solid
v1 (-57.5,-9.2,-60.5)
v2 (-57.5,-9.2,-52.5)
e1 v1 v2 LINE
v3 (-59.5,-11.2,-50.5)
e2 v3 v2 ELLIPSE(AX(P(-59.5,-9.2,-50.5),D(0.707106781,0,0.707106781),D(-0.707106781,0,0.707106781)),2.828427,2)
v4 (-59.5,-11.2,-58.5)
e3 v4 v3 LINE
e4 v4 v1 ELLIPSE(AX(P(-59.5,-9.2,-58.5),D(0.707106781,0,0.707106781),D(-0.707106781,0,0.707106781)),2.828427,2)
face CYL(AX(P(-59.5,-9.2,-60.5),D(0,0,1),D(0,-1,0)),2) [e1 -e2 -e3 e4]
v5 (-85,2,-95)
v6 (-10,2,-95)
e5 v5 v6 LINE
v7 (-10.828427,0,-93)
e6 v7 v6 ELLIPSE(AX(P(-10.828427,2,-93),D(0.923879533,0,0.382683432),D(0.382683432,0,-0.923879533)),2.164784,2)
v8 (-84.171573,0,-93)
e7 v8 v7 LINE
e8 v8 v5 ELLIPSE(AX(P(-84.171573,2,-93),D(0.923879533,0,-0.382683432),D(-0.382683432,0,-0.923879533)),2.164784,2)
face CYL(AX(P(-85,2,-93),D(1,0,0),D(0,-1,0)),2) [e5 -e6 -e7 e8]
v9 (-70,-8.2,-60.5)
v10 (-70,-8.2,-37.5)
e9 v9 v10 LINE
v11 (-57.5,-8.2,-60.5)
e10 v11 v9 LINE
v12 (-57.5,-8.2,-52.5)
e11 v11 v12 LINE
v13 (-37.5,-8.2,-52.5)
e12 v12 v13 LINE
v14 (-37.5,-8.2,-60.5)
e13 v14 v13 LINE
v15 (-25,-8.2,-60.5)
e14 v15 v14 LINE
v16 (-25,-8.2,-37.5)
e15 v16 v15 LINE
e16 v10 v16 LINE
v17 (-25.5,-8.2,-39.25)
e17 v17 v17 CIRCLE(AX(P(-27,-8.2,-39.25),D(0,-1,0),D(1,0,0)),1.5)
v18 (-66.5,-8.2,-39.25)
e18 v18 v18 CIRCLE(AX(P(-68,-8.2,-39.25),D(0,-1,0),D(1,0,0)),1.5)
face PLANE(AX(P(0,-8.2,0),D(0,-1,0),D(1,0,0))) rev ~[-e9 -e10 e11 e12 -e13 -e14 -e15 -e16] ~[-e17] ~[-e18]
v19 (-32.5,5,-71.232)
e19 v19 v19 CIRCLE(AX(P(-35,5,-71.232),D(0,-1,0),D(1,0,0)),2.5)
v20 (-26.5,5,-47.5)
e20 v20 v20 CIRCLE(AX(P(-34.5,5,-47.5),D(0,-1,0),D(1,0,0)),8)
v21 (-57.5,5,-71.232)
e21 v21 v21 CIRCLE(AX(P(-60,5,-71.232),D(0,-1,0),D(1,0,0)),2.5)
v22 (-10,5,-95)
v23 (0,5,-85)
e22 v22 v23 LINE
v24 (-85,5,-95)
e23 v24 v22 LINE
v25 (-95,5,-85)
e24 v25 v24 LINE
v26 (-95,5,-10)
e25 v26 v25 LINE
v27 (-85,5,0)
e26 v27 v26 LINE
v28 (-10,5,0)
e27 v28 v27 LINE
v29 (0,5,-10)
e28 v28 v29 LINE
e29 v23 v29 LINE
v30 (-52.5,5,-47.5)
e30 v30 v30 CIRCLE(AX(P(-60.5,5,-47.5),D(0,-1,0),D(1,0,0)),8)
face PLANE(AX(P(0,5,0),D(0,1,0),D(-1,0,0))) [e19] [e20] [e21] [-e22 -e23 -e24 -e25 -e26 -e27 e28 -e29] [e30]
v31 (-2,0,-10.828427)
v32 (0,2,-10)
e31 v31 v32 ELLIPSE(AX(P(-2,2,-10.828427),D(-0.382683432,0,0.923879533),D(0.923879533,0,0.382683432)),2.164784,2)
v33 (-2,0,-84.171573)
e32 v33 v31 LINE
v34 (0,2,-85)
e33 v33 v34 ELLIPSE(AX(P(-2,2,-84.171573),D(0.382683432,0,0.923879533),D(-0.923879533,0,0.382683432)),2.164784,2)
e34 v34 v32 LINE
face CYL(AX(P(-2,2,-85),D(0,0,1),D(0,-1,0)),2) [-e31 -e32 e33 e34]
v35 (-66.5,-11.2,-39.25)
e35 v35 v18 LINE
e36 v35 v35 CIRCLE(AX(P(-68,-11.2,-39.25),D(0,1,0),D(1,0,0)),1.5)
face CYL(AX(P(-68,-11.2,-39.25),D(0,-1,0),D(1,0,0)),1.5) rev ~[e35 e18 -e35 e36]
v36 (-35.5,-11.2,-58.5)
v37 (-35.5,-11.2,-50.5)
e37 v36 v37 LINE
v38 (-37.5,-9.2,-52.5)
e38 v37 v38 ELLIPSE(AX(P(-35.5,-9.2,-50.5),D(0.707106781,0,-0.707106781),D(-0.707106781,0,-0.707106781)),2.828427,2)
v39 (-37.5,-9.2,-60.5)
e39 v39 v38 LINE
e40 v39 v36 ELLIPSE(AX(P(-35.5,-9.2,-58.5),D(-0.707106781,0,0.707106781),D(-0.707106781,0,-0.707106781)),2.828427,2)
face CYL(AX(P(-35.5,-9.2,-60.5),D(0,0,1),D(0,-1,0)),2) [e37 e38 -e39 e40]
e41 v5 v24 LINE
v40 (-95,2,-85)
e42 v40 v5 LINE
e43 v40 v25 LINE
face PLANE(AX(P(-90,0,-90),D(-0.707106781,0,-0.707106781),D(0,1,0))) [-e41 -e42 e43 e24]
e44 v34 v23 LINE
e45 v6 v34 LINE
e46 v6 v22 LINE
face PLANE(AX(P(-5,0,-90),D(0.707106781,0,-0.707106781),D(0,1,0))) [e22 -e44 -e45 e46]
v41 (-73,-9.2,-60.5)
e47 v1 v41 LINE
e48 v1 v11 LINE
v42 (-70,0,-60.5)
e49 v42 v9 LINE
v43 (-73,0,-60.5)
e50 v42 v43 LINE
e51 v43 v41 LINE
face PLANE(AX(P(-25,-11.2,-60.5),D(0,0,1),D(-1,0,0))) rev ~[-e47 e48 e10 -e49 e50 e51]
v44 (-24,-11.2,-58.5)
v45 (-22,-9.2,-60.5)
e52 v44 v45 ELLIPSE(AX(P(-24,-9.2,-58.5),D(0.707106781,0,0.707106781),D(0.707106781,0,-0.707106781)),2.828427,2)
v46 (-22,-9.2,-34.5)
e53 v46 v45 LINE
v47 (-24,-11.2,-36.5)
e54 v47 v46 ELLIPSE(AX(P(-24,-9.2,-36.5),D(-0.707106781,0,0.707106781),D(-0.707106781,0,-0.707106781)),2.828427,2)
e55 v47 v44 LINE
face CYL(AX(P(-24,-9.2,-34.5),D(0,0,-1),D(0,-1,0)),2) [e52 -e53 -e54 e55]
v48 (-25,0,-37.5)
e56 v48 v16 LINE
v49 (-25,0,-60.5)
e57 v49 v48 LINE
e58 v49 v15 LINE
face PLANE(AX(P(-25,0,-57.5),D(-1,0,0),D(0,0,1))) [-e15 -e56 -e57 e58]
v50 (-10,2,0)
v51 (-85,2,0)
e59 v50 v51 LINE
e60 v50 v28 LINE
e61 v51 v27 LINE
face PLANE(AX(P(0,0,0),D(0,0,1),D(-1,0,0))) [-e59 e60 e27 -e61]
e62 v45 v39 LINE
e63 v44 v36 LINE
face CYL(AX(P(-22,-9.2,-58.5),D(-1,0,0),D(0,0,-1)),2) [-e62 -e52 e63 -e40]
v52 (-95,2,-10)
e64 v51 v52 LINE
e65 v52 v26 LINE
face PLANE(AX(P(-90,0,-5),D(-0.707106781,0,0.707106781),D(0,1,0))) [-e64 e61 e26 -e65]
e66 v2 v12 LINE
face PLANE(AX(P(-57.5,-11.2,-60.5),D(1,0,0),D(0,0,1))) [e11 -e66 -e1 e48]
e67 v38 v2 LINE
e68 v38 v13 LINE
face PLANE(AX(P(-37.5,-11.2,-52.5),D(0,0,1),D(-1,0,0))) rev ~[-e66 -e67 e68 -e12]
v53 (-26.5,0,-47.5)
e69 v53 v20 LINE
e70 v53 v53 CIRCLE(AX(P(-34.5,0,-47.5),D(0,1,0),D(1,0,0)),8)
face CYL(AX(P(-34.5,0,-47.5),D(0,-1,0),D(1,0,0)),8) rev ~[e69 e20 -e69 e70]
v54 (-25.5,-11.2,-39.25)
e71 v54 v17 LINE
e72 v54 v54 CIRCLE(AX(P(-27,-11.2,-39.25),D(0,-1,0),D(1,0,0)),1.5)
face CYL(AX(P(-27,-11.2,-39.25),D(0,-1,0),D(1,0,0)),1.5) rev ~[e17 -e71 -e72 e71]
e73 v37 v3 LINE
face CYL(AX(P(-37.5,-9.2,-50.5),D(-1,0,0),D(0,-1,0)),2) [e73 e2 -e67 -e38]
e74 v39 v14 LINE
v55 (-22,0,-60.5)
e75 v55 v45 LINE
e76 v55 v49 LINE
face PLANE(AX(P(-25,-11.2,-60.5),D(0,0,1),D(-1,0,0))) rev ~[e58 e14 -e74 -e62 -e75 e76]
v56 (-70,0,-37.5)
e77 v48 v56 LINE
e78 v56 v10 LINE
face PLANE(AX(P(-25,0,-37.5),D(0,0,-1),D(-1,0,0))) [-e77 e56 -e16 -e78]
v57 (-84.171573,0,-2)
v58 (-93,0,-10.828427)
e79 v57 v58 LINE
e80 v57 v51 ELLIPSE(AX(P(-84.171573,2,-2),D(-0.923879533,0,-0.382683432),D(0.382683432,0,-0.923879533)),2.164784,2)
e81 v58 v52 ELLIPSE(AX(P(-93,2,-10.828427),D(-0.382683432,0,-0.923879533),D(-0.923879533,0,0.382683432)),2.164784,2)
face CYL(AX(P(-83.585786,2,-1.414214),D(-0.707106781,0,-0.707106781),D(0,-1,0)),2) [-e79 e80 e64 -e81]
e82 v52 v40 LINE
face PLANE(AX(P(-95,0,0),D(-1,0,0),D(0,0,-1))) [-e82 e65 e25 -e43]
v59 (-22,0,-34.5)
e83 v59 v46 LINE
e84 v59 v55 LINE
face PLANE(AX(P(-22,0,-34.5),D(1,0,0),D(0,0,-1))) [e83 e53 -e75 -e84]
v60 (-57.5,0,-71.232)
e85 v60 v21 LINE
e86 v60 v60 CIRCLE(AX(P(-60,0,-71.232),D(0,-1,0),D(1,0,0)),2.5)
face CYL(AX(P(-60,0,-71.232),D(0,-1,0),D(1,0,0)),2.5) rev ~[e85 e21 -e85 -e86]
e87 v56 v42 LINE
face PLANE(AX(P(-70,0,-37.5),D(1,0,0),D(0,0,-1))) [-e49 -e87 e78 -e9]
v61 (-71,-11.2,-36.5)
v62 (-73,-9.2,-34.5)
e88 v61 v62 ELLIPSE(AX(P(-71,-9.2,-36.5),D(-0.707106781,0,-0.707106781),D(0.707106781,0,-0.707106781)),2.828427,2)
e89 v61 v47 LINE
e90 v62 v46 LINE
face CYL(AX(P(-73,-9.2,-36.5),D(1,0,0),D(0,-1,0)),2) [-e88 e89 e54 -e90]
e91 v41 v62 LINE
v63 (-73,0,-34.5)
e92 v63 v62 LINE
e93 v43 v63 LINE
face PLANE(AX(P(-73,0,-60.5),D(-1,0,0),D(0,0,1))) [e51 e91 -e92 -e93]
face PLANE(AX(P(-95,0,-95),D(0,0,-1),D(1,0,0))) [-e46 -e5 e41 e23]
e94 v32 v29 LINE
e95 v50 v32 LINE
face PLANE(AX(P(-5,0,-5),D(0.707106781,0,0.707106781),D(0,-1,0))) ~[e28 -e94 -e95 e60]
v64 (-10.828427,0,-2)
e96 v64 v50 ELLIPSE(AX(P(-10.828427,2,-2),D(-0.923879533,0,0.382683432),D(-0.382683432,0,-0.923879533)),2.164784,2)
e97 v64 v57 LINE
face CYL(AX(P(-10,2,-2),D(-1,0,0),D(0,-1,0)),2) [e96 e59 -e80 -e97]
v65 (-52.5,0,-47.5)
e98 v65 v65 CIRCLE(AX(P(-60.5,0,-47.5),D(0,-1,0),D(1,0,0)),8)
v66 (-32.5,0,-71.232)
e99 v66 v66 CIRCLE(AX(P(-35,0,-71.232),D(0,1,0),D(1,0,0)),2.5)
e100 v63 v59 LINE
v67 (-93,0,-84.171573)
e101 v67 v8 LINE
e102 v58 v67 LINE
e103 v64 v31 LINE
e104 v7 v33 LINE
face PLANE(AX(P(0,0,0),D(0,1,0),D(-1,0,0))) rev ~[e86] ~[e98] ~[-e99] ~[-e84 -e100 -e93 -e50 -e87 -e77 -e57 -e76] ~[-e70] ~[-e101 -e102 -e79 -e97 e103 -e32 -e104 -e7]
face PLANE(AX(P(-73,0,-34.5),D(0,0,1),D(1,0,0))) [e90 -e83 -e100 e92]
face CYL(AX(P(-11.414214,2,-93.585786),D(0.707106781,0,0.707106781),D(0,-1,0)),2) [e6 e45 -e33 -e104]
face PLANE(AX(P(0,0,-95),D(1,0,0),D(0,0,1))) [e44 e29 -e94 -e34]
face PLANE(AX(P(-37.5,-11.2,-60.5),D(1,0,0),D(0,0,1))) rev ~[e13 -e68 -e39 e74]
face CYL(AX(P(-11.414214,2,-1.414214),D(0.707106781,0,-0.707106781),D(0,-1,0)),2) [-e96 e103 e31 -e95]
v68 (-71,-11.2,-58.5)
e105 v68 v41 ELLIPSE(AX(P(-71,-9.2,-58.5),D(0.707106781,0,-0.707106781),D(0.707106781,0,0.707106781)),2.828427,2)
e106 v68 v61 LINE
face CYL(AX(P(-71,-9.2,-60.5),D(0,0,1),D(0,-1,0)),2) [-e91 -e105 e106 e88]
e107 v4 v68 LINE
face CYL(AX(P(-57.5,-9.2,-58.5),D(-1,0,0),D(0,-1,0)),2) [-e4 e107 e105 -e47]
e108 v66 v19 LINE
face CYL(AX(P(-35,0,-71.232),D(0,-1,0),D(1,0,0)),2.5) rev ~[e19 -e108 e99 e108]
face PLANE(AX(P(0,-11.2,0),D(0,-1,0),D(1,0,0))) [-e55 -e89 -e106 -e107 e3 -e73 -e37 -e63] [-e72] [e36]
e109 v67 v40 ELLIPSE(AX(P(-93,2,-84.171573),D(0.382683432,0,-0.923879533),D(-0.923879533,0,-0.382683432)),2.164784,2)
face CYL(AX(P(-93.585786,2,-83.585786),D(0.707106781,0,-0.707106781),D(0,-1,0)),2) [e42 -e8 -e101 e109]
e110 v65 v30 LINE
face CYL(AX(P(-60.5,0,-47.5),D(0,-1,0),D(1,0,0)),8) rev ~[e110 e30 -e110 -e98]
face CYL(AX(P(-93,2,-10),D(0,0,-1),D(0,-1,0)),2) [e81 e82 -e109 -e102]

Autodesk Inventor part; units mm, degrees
ref_plane "YZ Plane" through (0, 0, 0) normal (1, 0, 0) x (0, 1, 0)
ref_plane "XZ Plane" through (0, 0, 0) normal (0, 1, 0) x (-1, 0, 0)
ref_plane "XY Plane" through (0, 0, 0) normal (0, 0, 1) x (1, 0, 0)
sketch "Sketch1" plane through (0, 0, 0) normal (0, 1, 0) x (-1, 0, 0)
  line L0 (0, 0) -> (95, 0)
  line L1 (95, 0) -> (95, -95)
  line L2 (95, -95) -> (0, -95)
  line L3 (0, -95) -> (0, 0)
  dimension "d0" = 95
  dimension "d1" = 95
extrude "Extrusion1" add sketch "Sketch1" along normal blind 5
chamfer "Chamfer1" distance 10 angle 45 4 edges at (0, 2.5, -95) (0, 2.5, 0) (-95, 2.5, 0) (-95, 2.5, -95)
sketch "Sketch2" plane through (0, 0, 0) normal (0, -1, 0) x (1, 0, 0)
  line L0 (-85, -95) -> (-95, -85) projected
  line L1 (-10, -95) -> (-85, -95) projected
  line L2 (0, -85) -> (-10, -95) projected
  line L3 (0, -10) -> (0, -85) projected
  line L4 (-10, 0) -> (0, -10) projected
  line L5 (-85, 0) -> (-10, 0) projected
  line L6 (-95, -10) -> (-85, 0) projected
  line L7 (-95, -85) -> (-95, -10) projected
  line L8 (-47.5, -95) -> (-47.5, -71.232)
  line L9 (-47.5, -71.232) -> (-35, -71.232)
  circle A0 centre (-35, -71.232) radius 2.5
  circle A1 centre (-60, -71.232) radius 2.5
  point P0 (0, 0)
  dimension "d7" = 23.768
  dimension "d9" = 12.5
  dimension "d15" = 5
extrude "Extrusion2" cut sketch "Sketch2" against normal blind 5 contours A0 | A1
sketch "Sketch3" plane through (0, 0, 0) normal (0, -1, 0) x (1, 0, 0)
  circle A0 centre (-35, -71.232) radius 2.5 projected
  line L0 (-85, -95) -> (-95, -85) projected
  line L1 (-10, -95) -> (-85, -95) projected
  line L2 (0, -85) -> (-10, -95) projected
  line L3 (0, -10) -> (0, -85) projected
  line L4 (-10, 0) -> (0, -10) projected
  line L5 (-85, 0) -> (-10, 0) projected
  line L6 (-95, -10) -> (-85, 0) projected
  line L7 (-95, -85) -> (-95, -10) projected
  line L8 (-47.5, -95) -> (-47.5, -47.5)
  line L9 (-85, 0) -> (-10, 0) projected
  line L10 (-34.5, -47.5) -> (-60.5, -47.5)
  circle A1 centre (-34.5, -47.5) radius 8
  circle A2 centre (-60.5, -47.5) radius 8
  point P0 (0, 0)
  dimension "d17" = 47.5
  dimension "d18" = 26
  dimension "d19" = 16
extrude "Extrusion3" cut sketch "Sketch3" against normal blind 5 contours A1 | A2
sketch "Sketch4" plane through (0, 0, 0) normal (0, -1, 0) x (1, 0, 0)
  circle A0 centre (-60.5, -47.5) radius 8 projected
  circle A1 centre (-34.5, -47.5) radius 8 projected
  circle A2 centre (-35, -71.232) radius 2.5 projected
  line L0 (-85, -95) -> (-95, -85) projected
  line L1 (-10, -95) -> (-85, -95) projected
  line L2 (0, -85) -> (-10, -95) projected
  line L3 (0, -10) -> (0, -85) projected
  line L4 (-10, 0) -> (0, -10) projected
  line L5 (-85, 0) -> (-10, 0) projected
  line L6 (-95, -10) -> (-85, 0) projected
  line L7 (-95, -85) -> (-95, -10) projected
  line L8 (-47.5, -95) -> (-47.5, -47.5)
  line L9 (-85, 0) -> (-10, 0) projected
  line L10 (-70, -57.5) -> (-25, -57.5)
  line L11 (-25, -57.5) -> (-25, -37.5)
  line L12 (-25, -37.5) -> (-70, -37.5)
  line L13 (-70, -37.5) -> (-70, -57.5)
  line L14 (-70, -57.5) -> (-25, -37.5) construction
  line L15 (-25, -57.5) -> (-70, -37.5) construction
  line L16 (-22, -34.5) -> (-22, -60.5)
  line L17 (-22, -60.5) -> (-73, -60.5)
  line L18 (-73, -60.5) -> (-73, -34.5)
  line L19 (-73, -34.5) -> (-22, -34.5)
  line L20 (-25, -57.5) -> (-25, -60.5)
  line L21 (-70, -57.5) -> (-70, -60.5)
  point P0 (0, 0)
  point P1 (-70, -60.5)
  dimension "d22" = 47.5
  dimension "d23" = 45
  dimension "d24" = 20
  dimension "d25" = 3
extrude "Extrusion4" add sketch "Sketch4" along normal blind 11.2 contours L20 L11 L12 L13 L21 L17 L18 L19 L16
sketch "Sketch5" plane through (0, -11.2, 0) normal (0, -1, 0) x (1, 0, 0)
  line L0 (-70, -37.5) -> (-25, -37.5) projected
  line L1 (-25, -37.5) -> (-25, -60.5) projected
  line L2 (-25, -60.5) -> (-22, -60.5) projected
  line L3 (-22, -60.5) -> (-22, -34.5) projected
  line L4 (-22, -34.5) -> (-73, -34.5) projected
  line L5 (-73, -34.5) -> (-73, -60.5) projected
  line L6 (-73, -60.5) -> (-70, -60.5) projected
  line L7 (-70, -60.5) -> (-70, -37.5) projected
  line L8 (-25, -60.5) -> (-70, -60.5)
  point P0 (0, 0)
extrude "Extrusion5" add sketch "Sketch5" against normal blind 3 contours L0 L1 L8 L7
sketch "Sketch6" plane through (0, -11.2, 0) normal (0, -1, 0) x (1, 0, 0)
  line L0 (-25, -37.5) -> (-70, -37.5) projected
  line L1 (-70, -37.5) -> (-70, -60.5) projected
  line L2 (-25, -60.5) -> (-25, -37.5) projected
  line L3 (-70, -37.5) -> (-70, -39.25)
  line L4 (-70, -39.25) -> (-68, -39.25)
  circle A0 centre (-68, -39.25) radius 1.5
  line L5 (-47.5, -37.5) -> (-47.5, -39.5)
  circle A1 centre (-27, -39.25) radius 1.5
  line L6 (-73, -60.5) -> (-22, -60.5) projected
  line L7 (-47.5, -60.5) -> (-57.5, -60.5)
  line L8 (-57.5, -60.5) -> (-57.5, -52.5)
  line L9 (-57.5, -52.5) -> (-47.5, -52.5)
  line L10 (-47.5, -52.5) -> (-47.5, -60.5)
  line L11 (-37.5, -60.5) -> (-37.5, -52.5)
  line L12 (-37.5, -52.5) -> (-47.5, -52.5)
  point P0 (0, 0)
  dimension "d30" = 1.75
  dimension "d31" = 2
  dimension "d32" = 3
  dimension "d33" = 2
  dimension "d36" = 10
  dimension "d37" = 8
extrude "Extrusion6" cut sketch "Sketch6" against normal blind 3 contours L6 L10 L12 L11 | L6 L8 L9 L10 | A0 | A1
fillet "Fillet1" radius 2 16 edges at (-90, 0, -5) (-95, 0, -47.5) (-47.5, 0, 0) (-5, 0, -5) (0, 0, -47.5) (-90, 0, -90) (-47.5, 0, -95) (-5, 0, -90) (-22, -11.2, -47.5) (-47.5, -11.2, -34.5) (-73, -11.2, -47.5) (-65.25, -11.2, -60.5) (-29.75, -11.2, -60.5) (-47.5, -11.2, -52.5) (-57.5, -11.2, -56.5) (-37.5, -11.2, -56.5)
properties part number "TutupAtas"
